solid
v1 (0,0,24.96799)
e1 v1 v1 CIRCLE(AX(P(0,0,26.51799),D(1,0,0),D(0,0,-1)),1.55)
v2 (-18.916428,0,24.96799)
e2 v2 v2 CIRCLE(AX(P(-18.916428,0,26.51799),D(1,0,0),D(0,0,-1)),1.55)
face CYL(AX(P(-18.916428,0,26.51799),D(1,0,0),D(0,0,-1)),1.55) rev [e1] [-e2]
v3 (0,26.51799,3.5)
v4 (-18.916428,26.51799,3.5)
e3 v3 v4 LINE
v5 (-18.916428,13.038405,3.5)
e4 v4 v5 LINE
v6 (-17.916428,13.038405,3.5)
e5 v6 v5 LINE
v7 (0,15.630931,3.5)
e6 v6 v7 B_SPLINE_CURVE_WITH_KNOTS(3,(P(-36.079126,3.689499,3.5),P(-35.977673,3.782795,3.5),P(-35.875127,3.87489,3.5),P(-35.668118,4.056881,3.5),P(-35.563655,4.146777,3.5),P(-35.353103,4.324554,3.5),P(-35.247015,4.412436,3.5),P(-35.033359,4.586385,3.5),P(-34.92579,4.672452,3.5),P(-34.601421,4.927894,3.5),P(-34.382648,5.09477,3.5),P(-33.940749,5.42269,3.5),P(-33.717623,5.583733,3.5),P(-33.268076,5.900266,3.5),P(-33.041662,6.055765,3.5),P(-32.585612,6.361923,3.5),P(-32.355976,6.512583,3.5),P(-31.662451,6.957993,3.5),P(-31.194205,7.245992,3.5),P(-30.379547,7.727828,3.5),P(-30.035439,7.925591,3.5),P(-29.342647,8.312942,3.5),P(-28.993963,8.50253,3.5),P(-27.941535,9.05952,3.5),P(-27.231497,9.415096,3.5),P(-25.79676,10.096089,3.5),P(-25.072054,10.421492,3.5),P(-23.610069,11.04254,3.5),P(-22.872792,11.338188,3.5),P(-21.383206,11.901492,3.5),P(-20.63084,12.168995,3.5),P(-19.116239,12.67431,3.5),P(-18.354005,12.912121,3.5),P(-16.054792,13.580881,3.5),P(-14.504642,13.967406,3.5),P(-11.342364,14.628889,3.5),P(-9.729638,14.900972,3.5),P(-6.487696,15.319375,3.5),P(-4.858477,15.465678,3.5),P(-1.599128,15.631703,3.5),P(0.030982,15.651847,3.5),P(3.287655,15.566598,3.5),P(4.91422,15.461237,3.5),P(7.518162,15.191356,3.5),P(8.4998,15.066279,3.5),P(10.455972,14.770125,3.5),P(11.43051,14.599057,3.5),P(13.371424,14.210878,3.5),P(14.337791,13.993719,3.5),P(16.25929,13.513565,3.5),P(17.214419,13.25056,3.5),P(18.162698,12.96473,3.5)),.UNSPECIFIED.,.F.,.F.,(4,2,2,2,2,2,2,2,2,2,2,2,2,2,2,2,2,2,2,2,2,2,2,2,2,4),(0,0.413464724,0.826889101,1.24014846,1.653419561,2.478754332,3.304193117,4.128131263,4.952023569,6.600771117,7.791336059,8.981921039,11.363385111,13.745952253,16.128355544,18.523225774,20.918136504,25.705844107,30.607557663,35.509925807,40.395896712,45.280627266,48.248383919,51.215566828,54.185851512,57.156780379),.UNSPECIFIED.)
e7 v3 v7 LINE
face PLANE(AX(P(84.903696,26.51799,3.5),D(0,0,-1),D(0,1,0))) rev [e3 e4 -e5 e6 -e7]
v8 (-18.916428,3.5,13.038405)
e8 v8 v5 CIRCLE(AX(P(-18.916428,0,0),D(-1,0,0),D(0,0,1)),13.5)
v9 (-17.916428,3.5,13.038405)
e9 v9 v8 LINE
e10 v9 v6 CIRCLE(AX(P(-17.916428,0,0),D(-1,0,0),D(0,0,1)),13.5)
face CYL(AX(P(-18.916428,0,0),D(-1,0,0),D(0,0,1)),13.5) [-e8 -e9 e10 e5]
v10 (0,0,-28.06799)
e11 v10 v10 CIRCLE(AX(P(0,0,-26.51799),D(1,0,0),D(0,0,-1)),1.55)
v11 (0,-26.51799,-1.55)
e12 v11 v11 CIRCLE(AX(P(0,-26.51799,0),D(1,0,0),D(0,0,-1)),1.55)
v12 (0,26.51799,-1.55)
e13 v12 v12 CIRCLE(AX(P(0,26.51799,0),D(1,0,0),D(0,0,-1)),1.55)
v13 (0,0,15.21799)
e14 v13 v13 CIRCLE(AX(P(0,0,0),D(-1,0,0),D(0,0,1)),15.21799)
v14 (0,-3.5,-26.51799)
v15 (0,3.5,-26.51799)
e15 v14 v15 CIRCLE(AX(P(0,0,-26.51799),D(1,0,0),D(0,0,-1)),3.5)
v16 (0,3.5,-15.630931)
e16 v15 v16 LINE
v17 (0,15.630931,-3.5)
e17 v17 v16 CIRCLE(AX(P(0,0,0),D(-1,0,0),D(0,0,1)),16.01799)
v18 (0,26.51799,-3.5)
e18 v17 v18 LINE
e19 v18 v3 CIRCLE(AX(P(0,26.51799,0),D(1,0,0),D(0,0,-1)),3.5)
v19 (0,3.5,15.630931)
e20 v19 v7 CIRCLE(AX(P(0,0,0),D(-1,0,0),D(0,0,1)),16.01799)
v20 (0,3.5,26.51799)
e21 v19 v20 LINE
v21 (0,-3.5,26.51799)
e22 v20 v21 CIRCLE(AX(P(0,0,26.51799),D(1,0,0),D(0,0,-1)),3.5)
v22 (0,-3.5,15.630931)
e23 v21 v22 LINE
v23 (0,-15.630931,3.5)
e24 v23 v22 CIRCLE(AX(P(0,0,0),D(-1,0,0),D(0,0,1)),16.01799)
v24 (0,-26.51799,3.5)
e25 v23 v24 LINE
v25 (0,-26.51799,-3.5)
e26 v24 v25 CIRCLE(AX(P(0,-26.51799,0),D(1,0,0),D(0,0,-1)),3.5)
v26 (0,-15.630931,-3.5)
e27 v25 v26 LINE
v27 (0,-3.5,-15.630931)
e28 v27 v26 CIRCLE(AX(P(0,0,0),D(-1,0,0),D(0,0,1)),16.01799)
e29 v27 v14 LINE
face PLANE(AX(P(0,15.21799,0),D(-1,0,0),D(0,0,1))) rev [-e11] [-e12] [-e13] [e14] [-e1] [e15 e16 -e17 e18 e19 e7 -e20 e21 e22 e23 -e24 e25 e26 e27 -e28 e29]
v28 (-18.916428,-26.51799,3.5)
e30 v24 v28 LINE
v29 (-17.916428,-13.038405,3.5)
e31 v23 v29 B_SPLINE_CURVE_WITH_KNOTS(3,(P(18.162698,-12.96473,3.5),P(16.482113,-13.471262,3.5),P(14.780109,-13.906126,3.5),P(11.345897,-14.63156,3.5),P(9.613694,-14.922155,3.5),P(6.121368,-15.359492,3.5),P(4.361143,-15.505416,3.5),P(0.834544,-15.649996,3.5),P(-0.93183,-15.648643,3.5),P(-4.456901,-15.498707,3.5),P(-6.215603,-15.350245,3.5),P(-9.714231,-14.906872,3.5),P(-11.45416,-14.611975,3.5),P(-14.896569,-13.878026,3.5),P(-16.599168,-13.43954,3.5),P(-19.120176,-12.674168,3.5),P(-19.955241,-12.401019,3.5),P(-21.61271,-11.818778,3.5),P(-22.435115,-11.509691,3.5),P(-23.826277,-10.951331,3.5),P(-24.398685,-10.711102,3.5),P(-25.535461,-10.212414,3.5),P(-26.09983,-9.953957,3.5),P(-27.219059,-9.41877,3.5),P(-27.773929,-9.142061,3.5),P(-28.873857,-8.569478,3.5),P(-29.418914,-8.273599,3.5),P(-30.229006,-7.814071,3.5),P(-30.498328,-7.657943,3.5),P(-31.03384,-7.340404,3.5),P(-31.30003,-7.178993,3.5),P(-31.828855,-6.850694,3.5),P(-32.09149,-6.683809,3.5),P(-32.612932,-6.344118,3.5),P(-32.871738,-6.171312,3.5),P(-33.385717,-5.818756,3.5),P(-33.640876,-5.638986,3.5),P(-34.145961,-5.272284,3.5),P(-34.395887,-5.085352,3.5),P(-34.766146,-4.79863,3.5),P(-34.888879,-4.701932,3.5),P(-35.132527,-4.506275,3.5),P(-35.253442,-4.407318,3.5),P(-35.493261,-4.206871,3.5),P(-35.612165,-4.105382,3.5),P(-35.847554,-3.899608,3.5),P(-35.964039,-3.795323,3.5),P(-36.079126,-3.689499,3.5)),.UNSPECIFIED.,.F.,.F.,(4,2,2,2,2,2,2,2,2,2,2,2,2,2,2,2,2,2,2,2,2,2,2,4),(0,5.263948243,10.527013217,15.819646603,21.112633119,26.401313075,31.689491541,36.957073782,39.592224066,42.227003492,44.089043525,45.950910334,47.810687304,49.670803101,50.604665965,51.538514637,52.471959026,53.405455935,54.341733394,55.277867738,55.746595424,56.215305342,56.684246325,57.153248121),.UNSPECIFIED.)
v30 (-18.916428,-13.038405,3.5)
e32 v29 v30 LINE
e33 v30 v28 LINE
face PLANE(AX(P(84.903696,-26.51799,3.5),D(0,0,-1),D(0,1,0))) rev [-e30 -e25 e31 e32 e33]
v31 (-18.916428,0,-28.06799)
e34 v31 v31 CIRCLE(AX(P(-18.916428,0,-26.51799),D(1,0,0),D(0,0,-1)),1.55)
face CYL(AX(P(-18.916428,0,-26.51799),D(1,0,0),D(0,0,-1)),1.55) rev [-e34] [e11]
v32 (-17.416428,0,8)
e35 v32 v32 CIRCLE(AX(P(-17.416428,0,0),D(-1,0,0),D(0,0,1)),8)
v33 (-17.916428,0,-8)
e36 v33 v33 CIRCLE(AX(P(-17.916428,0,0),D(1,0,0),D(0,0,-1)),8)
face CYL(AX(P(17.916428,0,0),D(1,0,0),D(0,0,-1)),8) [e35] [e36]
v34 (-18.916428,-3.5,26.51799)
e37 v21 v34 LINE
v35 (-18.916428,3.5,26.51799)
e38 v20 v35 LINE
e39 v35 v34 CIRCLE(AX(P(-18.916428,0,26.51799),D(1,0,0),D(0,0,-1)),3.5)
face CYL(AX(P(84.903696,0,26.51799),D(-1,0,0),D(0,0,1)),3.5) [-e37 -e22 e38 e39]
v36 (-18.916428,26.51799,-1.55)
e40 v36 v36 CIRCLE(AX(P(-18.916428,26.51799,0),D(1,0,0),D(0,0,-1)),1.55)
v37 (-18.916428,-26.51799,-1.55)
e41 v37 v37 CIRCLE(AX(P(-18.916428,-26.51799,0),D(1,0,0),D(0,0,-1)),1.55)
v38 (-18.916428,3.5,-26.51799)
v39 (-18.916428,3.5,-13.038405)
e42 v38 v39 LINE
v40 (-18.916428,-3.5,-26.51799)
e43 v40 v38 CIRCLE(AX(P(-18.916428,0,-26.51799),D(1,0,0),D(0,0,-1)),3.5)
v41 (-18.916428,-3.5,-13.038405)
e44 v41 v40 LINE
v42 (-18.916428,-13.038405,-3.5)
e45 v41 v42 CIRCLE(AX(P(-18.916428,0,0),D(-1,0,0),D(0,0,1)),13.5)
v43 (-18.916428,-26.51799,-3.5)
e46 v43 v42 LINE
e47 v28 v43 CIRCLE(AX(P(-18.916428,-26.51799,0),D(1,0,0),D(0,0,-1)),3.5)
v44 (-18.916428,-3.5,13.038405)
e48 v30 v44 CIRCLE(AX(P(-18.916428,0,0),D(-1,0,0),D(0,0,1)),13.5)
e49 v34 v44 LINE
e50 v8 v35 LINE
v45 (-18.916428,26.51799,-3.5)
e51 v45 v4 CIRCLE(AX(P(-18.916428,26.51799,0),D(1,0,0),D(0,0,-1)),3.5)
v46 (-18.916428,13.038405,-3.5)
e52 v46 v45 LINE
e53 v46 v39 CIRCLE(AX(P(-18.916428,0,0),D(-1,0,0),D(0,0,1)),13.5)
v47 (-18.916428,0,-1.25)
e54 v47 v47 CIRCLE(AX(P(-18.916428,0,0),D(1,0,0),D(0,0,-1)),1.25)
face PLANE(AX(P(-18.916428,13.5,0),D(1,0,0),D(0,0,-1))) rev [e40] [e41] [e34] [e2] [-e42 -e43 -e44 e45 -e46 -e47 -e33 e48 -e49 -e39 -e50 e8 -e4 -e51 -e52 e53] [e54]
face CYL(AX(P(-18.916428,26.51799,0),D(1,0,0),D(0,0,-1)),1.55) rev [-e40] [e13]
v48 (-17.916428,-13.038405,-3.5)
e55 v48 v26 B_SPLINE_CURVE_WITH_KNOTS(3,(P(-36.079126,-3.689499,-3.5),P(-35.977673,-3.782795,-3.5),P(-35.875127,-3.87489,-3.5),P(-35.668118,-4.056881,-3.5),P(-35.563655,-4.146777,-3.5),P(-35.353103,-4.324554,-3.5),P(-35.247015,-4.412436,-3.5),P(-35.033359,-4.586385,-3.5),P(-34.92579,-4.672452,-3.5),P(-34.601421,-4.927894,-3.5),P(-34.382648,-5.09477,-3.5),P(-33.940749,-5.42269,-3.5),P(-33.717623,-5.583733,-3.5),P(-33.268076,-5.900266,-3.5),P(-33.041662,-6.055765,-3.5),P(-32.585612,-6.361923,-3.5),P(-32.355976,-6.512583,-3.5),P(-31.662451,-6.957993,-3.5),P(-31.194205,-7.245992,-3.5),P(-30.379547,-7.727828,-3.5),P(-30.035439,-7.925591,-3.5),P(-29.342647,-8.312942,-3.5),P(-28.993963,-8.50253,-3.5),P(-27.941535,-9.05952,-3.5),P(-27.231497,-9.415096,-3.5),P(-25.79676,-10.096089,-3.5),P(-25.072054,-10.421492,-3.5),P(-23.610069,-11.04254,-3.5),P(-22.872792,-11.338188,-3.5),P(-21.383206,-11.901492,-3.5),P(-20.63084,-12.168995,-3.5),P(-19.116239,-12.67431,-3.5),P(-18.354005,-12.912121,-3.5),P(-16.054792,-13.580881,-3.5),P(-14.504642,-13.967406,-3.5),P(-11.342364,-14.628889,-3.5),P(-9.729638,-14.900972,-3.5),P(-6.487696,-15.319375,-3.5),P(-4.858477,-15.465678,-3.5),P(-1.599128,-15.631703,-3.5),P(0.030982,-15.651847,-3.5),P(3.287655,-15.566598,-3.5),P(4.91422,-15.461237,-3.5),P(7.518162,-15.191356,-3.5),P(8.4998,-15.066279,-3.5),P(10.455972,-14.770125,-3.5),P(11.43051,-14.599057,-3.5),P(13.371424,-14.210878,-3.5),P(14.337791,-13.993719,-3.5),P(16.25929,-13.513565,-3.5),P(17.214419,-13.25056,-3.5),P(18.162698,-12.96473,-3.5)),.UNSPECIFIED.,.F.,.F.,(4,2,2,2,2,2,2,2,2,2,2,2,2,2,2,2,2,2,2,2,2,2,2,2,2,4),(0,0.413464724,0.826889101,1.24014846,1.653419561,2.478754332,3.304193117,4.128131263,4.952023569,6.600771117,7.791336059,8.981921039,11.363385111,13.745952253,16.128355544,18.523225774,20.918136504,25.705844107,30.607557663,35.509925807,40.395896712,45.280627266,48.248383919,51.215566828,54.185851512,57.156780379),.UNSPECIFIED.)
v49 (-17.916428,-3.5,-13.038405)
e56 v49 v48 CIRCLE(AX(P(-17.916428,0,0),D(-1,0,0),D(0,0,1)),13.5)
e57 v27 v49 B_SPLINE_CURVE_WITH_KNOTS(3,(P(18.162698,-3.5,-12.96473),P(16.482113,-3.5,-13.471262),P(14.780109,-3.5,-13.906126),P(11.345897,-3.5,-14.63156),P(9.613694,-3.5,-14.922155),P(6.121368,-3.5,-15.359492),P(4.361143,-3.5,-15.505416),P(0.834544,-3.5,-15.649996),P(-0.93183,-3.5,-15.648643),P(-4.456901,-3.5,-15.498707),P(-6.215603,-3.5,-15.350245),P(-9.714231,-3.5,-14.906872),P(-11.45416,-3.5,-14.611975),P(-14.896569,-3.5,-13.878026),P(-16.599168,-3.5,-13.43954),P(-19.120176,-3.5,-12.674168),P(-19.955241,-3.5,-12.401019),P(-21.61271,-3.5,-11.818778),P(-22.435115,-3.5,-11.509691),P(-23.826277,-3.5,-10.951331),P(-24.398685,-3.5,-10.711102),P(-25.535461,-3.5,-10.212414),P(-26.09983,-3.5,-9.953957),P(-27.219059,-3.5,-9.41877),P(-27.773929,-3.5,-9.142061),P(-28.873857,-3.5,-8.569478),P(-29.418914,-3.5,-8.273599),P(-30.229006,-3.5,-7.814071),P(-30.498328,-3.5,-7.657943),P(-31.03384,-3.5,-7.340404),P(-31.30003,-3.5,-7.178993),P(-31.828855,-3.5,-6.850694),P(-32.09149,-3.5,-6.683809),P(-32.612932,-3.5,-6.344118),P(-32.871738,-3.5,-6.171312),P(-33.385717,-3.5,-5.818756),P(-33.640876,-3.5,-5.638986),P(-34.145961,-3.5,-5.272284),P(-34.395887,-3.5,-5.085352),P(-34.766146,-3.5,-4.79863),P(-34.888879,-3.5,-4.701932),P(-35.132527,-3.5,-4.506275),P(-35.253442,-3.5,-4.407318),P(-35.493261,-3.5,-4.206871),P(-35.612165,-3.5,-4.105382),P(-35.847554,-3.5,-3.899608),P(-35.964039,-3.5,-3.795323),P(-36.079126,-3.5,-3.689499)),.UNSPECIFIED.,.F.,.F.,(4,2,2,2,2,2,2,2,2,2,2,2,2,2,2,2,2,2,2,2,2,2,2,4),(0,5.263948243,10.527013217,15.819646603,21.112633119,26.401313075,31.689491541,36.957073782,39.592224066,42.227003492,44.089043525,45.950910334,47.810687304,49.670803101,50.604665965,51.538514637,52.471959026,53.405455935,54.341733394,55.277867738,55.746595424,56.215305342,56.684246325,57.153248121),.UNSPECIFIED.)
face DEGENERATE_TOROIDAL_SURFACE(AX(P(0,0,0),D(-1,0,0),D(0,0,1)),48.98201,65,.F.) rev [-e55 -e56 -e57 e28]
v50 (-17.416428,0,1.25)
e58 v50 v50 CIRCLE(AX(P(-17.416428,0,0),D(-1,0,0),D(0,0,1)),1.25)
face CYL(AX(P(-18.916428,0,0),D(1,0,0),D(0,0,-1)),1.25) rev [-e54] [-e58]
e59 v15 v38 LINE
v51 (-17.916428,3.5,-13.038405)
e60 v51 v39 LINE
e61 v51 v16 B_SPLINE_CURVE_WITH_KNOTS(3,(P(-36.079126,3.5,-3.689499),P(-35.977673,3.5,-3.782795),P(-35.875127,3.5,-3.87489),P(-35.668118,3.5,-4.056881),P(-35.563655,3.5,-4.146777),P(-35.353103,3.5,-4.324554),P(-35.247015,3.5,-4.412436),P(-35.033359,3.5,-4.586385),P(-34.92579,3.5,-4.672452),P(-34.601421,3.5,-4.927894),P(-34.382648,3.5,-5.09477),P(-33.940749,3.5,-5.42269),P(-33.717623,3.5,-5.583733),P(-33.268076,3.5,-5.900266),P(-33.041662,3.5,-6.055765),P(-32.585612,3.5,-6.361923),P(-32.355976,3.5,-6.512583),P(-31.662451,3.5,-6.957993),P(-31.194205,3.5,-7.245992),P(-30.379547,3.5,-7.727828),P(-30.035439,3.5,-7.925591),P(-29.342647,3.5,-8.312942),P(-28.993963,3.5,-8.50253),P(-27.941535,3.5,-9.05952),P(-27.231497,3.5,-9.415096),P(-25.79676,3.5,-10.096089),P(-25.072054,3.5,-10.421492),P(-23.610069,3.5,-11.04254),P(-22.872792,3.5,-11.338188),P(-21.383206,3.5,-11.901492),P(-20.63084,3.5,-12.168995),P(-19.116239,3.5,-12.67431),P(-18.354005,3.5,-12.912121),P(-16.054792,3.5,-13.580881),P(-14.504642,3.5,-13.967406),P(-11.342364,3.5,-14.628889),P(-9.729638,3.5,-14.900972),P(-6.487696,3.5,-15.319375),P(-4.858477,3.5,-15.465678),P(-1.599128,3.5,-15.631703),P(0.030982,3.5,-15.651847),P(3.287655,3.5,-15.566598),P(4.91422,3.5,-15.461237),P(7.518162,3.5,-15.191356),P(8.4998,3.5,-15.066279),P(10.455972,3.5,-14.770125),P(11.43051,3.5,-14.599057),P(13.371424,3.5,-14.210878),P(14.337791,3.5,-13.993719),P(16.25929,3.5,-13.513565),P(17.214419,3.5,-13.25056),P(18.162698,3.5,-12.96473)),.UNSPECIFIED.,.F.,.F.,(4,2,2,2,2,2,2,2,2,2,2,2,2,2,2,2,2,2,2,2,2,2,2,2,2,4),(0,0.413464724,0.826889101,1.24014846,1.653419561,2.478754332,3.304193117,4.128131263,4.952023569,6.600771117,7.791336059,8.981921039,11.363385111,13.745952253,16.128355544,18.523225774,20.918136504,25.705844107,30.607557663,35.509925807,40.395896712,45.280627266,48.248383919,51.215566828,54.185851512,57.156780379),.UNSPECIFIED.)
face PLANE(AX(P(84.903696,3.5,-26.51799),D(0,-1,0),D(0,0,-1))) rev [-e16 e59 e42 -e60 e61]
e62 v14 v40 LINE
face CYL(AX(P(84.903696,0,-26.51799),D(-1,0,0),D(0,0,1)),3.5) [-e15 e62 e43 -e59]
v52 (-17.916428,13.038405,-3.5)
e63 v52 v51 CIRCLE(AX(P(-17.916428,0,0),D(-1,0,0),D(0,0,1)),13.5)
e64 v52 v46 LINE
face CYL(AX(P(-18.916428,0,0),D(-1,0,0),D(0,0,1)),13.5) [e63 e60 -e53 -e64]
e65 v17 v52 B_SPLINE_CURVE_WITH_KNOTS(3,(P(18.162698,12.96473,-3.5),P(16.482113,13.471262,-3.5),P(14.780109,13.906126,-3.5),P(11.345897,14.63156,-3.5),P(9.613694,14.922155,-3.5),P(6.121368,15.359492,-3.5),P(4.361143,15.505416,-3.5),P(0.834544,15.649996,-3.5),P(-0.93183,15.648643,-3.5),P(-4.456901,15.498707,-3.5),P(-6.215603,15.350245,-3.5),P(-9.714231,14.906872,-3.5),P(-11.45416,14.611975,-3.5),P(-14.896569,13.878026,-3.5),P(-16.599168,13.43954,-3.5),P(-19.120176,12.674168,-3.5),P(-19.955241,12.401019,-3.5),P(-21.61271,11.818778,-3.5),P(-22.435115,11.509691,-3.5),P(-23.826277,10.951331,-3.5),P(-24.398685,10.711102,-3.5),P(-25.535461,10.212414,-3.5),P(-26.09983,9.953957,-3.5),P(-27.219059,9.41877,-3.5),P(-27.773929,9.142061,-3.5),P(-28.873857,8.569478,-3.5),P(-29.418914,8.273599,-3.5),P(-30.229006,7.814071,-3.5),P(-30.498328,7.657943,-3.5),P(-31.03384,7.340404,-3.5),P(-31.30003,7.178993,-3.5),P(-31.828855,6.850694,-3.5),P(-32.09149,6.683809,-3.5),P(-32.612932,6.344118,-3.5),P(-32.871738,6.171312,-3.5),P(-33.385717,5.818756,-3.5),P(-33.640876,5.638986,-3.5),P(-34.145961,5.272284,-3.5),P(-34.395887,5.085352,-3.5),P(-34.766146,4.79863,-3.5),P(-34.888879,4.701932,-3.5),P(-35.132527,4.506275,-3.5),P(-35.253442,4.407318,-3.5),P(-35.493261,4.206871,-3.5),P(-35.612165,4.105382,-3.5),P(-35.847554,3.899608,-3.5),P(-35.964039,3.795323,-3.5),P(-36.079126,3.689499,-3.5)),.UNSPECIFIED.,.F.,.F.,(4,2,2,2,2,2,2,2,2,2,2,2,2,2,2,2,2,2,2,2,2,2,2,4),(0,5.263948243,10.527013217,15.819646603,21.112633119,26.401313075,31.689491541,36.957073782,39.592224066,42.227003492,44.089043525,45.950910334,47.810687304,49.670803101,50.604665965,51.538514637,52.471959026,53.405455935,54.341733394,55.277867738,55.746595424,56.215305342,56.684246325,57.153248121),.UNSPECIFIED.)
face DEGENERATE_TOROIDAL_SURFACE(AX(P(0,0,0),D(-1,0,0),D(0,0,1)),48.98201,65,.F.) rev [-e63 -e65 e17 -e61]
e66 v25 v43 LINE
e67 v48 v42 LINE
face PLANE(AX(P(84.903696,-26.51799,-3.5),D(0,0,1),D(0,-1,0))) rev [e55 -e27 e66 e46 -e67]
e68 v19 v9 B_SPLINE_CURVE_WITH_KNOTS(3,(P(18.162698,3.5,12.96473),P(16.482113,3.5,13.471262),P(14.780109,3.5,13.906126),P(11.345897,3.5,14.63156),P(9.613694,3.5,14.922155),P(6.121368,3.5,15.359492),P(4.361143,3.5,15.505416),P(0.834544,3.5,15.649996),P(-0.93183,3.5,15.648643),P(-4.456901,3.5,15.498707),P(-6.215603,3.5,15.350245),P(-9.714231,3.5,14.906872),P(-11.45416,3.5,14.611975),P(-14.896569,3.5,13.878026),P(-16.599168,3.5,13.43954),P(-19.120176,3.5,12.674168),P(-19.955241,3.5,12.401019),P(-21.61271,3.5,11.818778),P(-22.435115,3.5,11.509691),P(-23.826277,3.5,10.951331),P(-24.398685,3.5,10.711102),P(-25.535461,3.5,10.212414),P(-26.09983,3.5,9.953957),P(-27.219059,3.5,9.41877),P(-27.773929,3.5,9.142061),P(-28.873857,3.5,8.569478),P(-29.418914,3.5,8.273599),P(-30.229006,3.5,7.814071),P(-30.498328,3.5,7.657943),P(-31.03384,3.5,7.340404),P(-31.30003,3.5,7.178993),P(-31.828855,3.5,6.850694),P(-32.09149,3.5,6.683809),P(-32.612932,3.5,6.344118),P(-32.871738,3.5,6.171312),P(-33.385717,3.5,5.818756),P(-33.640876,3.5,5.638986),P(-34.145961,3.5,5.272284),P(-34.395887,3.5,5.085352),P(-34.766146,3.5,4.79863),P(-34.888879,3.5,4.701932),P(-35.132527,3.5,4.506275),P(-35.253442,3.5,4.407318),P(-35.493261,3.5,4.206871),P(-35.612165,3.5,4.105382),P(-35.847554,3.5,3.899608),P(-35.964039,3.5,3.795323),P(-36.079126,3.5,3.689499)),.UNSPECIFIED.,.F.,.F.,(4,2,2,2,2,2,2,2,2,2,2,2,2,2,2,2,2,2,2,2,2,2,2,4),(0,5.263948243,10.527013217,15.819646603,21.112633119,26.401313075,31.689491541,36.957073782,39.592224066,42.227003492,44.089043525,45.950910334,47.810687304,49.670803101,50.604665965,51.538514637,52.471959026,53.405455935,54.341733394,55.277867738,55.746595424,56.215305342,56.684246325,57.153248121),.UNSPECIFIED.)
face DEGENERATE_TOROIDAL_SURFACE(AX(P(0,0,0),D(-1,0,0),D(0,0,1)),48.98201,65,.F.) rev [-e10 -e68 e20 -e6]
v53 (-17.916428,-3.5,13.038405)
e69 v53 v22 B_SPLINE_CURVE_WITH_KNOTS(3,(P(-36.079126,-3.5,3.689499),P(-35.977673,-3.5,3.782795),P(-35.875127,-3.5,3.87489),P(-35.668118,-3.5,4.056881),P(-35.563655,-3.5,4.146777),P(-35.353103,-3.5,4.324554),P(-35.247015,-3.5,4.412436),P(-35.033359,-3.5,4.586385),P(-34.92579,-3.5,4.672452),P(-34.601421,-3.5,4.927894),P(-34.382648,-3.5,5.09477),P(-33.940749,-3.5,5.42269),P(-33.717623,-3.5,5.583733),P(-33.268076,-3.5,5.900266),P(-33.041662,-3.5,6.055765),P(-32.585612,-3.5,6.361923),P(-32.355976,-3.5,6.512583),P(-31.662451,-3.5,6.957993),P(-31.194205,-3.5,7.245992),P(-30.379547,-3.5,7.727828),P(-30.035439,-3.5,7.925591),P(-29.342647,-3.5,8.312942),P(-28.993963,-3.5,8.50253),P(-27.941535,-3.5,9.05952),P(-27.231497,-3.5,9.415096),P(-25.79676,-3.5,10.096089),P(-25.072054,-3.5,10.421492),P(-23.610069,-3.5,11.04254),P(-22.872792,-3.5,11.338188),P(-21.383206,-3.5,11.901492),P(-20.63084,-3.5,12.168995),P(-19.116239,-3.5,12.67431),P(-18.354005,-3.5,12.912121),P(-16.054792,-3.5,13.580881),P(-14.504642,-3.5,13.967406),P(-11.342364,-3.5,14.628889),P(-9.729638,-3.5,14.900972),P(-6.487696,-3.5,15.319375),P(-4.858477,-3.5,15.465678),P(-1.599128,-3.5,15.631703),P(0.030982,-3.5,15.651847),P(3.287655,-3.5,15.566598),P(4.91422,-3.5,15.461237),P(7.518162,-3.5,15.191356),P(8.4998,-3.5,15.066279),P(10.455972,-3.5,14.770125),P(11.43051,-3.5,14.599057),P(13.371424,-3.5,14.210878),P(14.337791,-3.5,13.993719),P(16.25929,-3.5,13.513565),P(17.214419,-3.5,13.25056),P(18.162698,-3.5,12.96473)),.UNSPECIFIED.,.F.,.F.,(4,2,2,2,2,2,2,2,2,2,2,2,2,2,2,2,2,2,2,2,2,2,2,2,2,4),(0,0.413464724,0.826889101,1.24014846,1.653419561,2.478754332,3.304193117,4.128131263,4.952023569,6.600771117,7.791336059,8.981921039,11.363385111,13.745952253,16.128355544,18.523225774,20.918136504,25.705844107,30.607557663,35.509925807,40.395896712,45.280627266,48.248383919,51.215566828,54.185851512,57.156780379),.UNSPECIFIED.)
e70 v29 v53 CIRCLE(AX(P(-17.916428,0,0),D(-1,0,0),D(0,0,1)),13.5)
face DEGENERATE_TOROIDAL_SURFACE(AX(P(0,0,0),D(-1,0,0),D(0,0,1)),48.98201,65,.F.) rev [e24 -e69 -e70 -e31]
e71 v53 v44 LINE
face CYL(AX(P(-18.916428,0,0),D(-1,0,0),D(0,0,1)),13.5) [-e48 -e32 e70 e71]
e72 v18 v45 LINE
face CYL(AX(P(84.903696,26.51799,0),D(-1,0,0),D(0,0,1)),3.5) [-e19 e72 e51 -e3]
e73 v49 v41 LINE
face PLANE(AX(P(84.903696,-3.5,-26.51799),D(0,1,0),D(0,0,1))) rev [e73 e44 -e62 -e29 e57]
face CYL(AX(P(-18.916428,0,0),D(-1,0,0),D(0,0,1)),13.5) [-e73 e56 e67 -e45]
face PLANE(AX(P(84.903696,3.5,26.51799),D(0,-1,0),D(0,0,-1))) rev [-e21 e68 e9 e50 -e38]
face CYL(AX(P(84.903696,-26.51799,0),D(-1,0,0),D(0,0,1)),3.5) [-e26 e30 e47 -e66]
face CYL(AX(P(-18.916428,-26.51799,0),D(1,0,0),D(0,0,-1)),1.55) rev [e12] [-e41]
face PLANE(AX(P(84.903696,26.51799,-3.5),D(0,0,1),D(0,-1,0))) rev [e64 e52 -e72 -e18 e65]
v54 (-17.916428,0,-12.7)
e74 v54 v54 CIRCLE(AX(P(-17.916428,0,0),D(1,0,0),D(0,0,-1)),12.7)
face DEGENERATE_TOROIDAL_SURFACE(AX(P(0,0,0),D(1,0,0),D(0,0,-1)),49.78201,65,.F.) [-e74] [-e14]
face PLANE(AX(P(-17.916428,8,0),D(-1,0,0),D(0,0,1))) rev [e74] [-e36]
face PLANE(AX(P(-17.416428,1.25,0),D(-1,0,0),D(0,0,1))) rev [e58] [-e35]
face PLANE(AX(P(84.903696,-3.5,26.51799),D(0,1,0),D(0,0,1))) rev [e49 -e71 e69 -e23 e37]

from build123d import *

# Parameters (mm, degrees)
BOSS_EXTRUDE1_DEPTH = 18.916428128
SKETCH2_R           = 1.25
CUT_EXTRUDE1_DEPTH  = 47.475699972
SKETCH4_R           = 1.55
CUT_EXTRUDE2_DEPTH  = 47.475699972


# Read off the part's stored shape, not the designer's step: Roller coating 12, Roller core 12 coated
with BuildPart() as part:
    # Roller coating 12 outline → Roller coating 12 (revolve)
    with BuildSketch(Plane.YX):
        with BuildLine():
            ThreePointArc((12.7, -17.916428128), (15.217989764, 0), (12.7, 17.916428128))
            Line((12.7, 17.916428128), (8, 17.916428128))
            Line((8, 17.916428128), (8, 17.416428128))
            Line((8, 17.416428128), (12.322080058, 17.416428128))
            ThreePointArc((12.322080058, 17.416428128), (14.717989764, 0), (12.322080058, -17.416428128))
            Line((12.322080058, -17.416428128), (8, -17.416428128))
            Line((8, -17.416428128), (8, -17.916428128))
            Line((8, -17.916428128), (12.7, -17.916428128))
        make_face()
    revolve(axis=Axis((0, 0, 0), (1, 0, 0)))


with BuildPart() as body_2:
    # Roller core 12 coated outline → Roller core 12 coated (revolve)
    with BuildSketch(Plane.YX):
        with BuildLine():
            Line((1.25, 17.416428128), (1.25, -17.416428128))
            Line((1.25, -17.416428128), (12.322080058, -17.416428128))
            ThreePointArc((12.322080058, -17.416428128), (14.717989764, 0), (12.322080058, 17.416428128))
            Line((12.322080058, 17.416428128), (1.25, 17.416428128))
        make_face()
    revolve(axis=Axis((0, 0, 0), (1, 0, 0)))


with BuildPart() as part_1:
    add(part.part)

    # Combine1: union body 2
    add(body_2.part)


with BuildPart() as body_2_2:
    # Sketch1 → Revolve1 (revolve)
    with BuildSketch(Plane.XY, mode=Mode.PRIVATE) as revolve1_sk:
        with BuildLine():
            Line((0, 0), (0, 15.217989764))
            Line((0, 15.217989764), (0, 16.017989764))
            ThreePointArc((0, 16.017989764), (-9.046251562, 15.385414232), (-17.916428128, 13.5))
            Line((-17.916428128, 13.5), (-18.916428128, 13.5))
            Line((-18.916428128, 13.5), (-18.916428128, 0))
            Line((-18.916428128, 0), (0, 0))
        make_face()
    revolve(revolve1_sk.sketch.rotate(Axis((-18.916428128, 0, 0), (1, 0, 0)), 270), axis=Axis((-18.916428128, 0, 0), (1, 0, 0)))

    # Sketch3 → Boss-Extrude1 (add)
    with BuildSketch(Plane(origin=(-18.916428128, 0, 0), x_dir=(0, 0, -1), z_dir=(1, 0, 0))):
        with BuildLine():
            Line((-3.5, 26.517989764), (-3.5, 13.03840481))
            ThreePointArc((-3.5, 13.03840481), (-9.545941546, 9.545941546), (-13.03840481, 3.5))
            Line((-13.03840481, 3.5), (-26.517989764, 3.5))
            ThreePointArc((-26.517989764, 3.5), (-30.017989764, 0), (-26.517989764, -3.5))
            Line((-26.517989764, -3.5), (-13.03840481, -3.5))
            ThreePointArc((-13.03840481, -3.5), (-9.545941546, -9.545941546), (-3.5, -13.03840481))
            Line((-3.5, -13.03840481), (-3.5, -26.517989764))
            ThreePointArc((-3.5, -26.517989764), (0, -30.017989764), (3.5, -26.517989764))
            Line((3.5, -26.517989764), (3.5, -13.03840481))
            ThreePointArc((3.5, -13.03840481), (9.545941546, -9.545941546), (13.03840481, -3.5))
            Line((13.03840481, -3.5), (26.517989764, -3.5))
            ThreePointArc((26.517989764, -3.5), (30.017989764, 0), (26.517989764, 3.5))
            Line((26.517989764, 3.5), (13.03840481, 3.5))
            ThreePointArc((13.03840481, 3.5), (9.545941546, 9.545941546), (3.5, 13.03840481))
            Line((3.5, 13.03840481), (3.5, 26.517989764))
            ThreePointArc((3.5, 26.517989764), (0, 30.017989764), (-3.5, 26.517989764))
        make_face()
    extrude(amount=BOSS_EXTRUDE1_DEPTH)

    # Combine2: cut part
    add(part_1.part, mode=Mode.SUBTRACT)

    # Sketch2 → Cut-Extrude1 (cut, through all)
    with BuildSketch(Plane(origin=(0, 0, 0), x_dir=(0, 0, -1), z_dir=(1, 0, 0))):
        Circle(SKETCH2_R)
    extrude(amount=-CUT_EXTRUDE1_DEPTH, mode=Mode.SUBTRACT)

    # Sketch4 → Cut-Extrude2 (cut, through all)
    with BuildSketch(Plane(origin=(0, 0, 0), x_dir=(0, 0, -1), z_dir=(1, 0, 0))):
        with Locations((0, -26.517989764)):
            Circle(SKETCH4_R)
        with Locations((-26.517989764, 0)):
            Circle(SKETCH4_R)
        with Locations((0, 26.517989764)):
            Circle(SKETCH4_R)
        with Locations((26.517989764, 0)):
            Circle(SKETCH4_R)
    extrude(amount=-CUT_EXTRUDE2_DEPTH, mode=Mode.SUBTRACT)


solid = body_2_2.part
